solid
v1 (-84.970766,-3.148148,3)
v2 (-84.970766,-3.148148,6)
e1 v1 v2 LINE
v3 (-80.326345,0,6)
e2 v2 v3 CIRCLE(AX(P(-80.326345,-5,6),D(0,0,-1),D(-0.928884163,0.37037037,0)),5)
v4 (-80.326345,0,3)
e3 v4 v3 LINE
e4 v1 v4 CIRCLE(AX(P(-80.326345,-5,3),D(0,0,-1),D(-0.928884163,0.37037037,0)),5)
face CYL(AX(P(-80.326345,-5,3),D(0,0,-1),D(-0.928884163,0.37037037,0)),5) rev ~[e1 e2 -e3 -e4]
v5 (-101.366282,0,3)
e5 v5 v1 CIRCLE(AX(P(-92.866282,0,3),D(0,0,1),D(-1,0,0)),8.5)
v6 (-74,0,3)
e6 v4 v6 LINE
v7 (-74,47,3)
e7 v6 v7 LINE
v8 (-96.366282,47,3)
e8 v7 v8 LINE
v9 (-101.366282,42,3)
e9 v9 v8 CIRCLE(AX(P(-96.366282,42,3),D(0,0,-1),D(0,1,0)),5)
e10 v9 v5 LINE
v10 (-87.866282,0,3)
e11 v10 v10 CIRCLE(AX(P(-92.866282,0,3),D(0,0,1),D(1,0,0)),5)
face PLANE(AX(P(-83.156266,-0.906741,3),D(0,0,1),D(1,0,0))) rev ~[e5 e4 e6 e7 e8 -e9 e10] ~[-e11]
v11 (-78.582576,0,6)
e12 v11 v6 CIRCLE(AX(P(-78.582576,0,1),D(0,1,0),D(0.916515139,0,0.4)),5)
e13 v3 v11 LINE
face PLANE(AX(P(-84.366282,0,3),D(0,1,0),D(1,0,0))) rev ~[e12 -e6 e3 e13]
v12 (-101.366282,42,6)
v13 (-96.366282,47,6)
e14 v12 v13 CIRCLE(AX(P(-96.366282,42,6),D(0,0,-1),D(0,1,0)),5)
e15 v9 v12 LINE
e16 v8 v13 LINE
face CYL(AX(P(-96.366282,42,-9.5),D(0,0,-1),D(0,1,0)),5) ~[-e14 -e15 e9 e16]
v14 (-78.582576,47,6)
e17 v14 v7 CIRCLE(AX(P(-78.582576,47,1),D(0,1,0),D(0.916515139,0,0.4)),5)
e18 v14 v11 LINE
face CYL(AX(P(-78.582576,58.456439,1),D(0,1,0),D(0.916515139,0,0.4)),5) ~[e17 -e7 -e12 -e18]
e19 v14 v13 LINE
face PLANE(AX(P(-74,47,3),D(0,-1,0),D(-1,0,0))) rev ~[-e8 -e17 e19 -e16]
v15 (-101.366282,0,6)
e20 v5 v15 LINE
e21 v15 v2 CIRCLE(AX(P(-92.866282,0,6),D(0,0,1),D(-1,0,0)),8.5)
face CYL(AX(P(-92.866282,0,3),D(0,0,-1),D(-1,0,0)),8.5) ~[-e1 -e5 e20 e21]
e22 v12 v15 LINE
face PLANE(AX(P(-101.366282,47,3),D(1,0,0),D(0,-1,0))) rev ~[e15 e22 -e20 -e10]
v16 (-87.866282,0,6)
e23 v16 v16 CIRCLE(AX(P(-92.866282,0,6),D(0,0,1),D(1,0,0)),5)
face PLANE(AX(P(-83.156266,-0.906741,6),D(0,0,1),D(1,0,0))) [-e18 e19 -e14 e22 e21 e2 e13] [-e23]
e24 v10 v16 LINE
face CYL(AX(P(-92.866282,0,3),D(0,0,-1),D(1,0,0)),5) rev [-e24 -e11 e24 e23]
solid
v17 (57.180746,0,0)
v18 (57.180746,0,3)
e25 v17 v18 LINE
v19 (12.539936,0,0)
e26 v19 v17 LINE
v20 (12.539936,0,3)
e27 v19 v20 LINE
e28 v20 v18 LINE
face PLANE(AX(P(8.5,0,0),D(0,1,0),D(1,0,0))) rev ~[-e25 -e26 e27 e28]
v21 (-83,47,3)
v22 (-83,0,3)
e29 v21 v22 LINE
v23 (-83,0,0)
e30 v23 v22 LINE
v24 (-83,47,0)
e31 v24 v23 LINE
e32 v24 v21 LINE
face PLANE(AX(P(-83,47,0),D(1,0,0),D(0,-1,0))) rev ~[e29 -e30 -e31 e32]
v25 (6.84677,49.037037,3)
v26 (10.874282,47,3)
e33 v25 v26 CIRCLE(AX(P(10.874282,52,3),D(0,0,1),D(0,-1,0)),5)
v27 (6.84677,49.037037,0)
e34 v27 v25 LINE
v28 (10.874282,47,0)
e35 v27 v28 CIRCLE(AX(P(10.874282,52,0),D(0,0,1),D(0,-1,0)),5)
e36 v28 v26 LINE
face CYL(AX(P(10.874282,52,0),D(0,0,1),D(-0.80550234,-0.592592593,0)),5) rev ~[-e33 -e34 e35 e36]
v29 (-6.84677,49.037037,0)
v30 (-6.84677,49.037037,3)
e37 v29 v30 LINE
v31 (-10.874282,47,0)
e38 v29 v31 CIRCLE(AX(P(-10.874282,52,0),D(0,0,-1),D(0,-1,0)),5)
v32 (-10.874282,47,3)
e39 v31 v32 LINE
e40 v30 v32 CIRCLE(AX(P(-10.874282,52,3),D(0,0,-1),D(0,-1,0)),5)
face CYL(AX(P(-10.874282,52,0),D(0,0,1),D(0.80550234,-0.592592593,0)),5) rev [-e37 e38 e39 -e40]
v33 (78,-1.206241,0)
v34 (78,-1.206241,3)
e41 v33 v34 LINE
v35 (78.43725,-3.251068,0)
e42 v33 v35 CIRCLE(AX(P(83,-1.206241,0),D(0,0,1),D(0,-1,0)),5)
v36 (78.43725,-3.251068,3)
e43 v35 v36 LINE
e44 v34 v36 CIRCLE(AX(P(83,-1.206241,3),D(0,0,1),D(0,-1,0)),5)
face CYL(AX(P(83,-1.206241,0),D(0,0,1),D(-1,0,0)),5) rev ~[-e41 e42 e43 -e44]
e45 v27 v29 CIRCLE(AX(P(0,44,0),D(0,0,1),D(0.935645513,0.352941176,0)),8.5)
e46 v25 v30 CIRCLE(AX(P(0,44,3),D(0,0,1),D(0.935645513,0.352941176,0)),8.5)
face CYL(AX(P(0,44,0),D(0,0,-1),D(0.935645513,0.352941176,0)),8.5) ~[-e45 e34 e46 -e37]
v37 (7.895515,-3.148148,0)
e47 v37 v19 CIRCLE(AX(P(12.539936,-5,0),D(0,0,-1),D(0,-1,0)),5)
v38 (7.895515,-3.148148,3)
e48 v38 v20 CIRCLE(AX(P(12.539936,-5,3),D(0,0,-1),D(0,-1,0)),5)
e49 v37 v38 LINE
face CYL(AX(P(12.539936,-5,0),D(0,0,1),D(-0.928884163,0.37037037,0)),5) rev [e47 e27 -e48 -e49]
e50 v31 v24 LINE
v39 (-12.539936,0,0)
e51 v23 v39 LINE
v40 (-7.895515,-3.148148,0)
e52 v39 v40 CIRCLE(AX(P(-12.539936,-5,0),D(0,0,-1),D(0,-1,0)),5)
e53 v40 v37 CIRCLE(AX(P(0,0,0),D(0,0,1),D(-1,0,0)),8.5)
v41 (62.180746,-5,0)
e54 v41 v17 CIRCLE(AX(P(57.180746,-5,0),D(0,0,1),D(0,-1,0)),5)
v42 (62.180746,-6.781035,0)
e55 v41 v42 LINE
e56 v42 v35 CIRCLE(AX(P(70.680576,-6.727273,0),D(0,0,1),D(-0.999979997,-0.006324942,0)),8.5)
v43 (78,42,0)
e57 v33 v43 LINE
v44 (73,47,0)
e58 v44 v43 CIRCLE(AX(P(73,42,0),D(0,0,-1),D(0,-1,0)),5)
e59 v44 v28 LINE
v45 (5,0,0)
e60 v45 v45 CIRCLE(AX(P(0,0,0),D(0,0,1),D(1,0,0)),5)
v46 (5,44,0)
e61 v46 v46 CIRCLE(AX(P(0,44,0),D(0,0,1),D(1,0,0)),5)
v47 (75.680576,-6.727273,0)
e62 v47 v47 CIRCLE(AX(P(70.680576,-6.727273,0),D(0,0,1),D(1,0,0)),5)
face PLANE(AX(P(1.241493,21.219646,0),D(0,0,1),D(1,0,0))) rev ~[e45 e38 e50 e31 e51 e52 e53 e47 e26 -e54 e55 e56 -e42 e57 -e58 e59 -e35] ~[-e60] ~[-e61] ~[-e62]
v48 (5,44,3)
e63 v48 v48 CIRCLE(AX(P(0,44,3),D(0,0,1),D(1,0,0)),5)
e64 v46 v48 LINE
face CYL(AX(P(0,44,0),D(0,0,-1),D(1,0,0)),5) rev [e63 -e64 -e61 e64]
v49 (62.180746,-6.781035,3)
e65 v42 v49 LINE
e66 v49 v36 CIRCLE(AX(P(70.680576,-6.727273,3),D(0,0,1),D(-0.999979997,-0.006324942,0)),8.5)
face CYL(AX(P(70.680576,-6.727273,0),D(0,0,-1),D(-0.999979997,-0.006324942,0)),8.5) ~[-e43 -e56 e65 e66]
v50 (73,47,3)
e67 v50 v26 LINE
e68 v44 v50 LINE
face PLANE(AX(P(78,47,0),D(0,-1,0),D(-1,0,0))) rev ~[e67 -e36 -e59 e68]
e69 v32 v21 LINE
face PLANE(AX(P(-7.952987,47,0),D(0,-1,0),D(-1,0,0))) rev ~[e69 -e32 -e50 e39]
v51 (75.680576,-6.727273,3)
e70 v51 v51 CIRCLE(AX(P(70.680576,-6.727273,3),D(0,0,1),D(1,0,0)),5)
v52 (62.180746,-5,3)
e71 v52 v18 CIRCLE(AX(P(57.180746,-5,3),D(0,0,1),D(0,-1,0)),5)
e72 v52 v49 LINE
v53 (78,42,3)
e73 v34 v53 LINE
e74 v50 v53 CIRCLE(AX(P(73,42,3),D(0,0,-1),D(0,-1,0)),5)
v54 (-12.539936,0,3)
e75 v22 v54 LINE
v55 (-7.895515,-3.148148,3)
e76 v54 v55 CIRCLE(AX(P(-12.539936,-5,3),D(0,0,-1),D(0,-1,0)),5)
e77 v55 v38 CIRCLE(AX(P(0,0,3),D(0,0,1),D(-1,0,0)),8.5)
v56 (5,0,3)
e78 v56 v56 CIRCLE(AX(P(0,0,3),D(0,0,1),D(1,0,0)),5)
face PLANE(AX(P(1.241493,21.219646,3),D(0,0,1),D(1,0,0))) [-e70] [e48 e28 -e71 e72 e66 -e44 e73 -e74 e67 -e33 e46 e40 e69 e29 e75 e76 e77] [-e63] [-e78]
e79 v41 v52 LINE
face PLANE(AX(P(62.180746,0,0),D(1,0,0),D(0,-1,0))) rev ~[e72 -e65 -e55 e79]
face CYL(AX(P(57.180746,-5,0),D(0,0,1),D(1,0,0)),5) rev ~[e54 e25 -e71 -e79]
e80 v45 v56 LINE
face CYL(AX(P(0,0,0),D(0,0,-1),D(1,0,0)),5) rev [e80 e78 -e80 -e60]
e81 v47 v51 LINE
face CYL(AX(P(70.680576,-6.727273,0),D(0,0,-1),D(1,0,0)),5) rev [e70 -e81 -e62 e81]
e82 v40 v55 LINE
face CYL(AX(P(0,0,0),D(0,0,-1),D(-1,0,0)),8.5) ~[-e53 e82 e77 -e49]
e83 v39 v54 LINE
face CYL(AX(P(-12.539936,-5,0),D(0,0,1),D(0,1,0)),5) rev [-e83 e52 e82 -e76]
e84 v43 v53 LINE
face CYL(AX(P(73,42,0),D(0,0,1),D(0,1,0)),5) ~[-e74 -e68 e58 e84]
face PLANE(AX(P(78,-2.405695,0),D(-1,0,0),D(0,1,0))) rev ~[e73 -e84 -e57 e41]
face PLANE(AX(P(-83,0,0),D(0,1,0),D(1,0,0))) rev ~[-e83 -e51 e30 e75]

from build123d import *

# Parameters (mm, degrees)
F0_R          = 5
F1_DEPTH      = 3
F2_W          = 9
F2_H          = 47
F2_R          = 5
F3_DEPTH      = 3
F4_F1_R       = 5
F4_F2_R       = 5
F4_2_T1_DEPTH = 3
F4_2_T3_DEPTH = 69.9128784748
F4_2_T5_DEPTH = 28


# Not quite as in the source:
# - a fillet or chamfer that OpenCascade refuses, or shapes differently, is made with other operations: its cross-section is extruded or revolved along the edge and cut away or added


with BuildPart() as f1:
    # F0 (on Top) → F1 (new body)
    with BuildSketch(Plane.XY):
        with BuildLine():
            ThreePointArc((7.9529868603, 47), (0, 52.5), (-7.9529868603, 47))
            Line((-7.9529868603, 47), (-83, 47))
            Line((-83, 47), (-83, 0))
            Line((-83, 0), (-8.5, 0))
            ThreePointArc((-8.5, 0), (0, -8.5), (8.5, 0))
            Line((8.5, 0), (62.1807458666, 0))
            Line((62.1807458666, 0), (62.1807458666, -6.6735107167))
            Line((62.1807458666, -6.6735107167), (62.1807458666, -6.7810347379))
            ThreePointArc((62.1807458666, -6.7810347379), (72.9464615235, -14.9196937423), (78, -2.4056954659))
            Line((78, -2.4056954659), (78, 47))
            Line((78, 47), (7.9529868603, 47))
        make_face()
        Circle(F0_R, mode=Mode.SUBTRACT)
        with Locations((70.6805758441, -6.7272727273)):
            Circle(F0_R, mode=Mode.SUBTRACT)
        with Locations((0, 44)):
            Circle(F0_R, mode=Mode.SUBTRACT)
    extrude(amount=F1_DEPTH)

    # F4: fillet of radius 5 on 7 edges, made by hand

    # F4_f1
    f4_f1_edges = [f1.edges().sort_by_distance(p)[0] for p in [
        (8.5, 0, 1.5),
        (-8.5, 0, 1.5),
        (62.1807458666, 0, 1.5),
        (78, -2.4056954659, 1.5),
        (7.9529868603, 47, 1.5),
        (-7.9529868603, 47, 1.5),
    ]]
    fillet(f4_f1_edges, radius=F4_F1_R)

    # F4_f2
    f4_f2_edges = [f1.edges().sort_by_distance(p)[0] for p in [
        (78, 47, 1.5),
    ]]
    fillet(f4_f2_edges, radius=F4_F2_R)


with BuildPart() as f3:
    # F2 (on face) → F3 (new body)
    with BuildSketch(Plane.XY.offset(3)):
        with Locations((-78.5, 23.5)):
            Rectangle(F2_W, F2_H)
        with BuildLine():
            Line((-84.3662815094, 0), (-83, 0))
            Line((-83, 0), (-83, 47))
            Line((-83, 47), (-101.3662815094, 47))
            Line((-101.3662815094, 47), (-101.3662815094, 0))
            ThreePointArc((-101.3662815094, 0), (-92.8662815094, -8.5), (-84.3662815094, 0))
        make_face()
        with Locations((-92.8662815094, 0)):
            Circle(F2_R, mode=Mode.SUBTRACT)
    extrude(amount=F3_DEPTH)

    # F4#2: fillet of radius 5 on 3 edges, made by hand

    # F4_2_s2 → F4_2_t1 (join)
    with BuildSketch(Plane.XY.offset(3)):
        with BuildLine():
            ThreePointArc((-84.9707661217, -3.1481481481), (-83.1317633438, -0.8612043262), (-80.3263453054, 0))
            Line((-80.3263453054, 0), (-84.3662815094, 0))
            ThreePointArc((-84.3662815094, 0), (-84.5187704793, -1.6028286254), (-84.9707661217, -3.1481481481))
        make_face()
    extrude(amount=F4_2_T1_DEPTH)

    # F4_2_s4 → F4_2_t3 (cut)
    with BuildSketch(Plane.XZ.offset(-58.4564392374)):
        with BuildLine():
            ThreePointArc((-74, 3), (-75.8439629074, 5.1833001327), (-78.582575695, 6))
            Line((-78.582575695, 6), (-74, 6))
            Line((-74, 6), (-74, 3))
        make_face()
    extrude(amount=F4_2_T3_DEPTH, mode=Mode.SUBTRACT)

    # F4_2_s6 → F4_2_t5 (cut)
    with BuildSketch(Plane.XY.offset(-9.5)):
        with BuildLine():
            ThreePointArc((-96.3662815094, 47), (-99.9018154153, 45.5355339059), (-101.3662815094, 42))
            Line((-101.3662815094, 42), (-101.3662815094, 47))
            Line((-101.3662815094, 47), (-96.3662815094, 47))
        make_face()
    extrude(amount=F4_2_T5_DEPTH, mode=Mode.SUBTRACT)


solid = Compound([f1.part, f3.part])
